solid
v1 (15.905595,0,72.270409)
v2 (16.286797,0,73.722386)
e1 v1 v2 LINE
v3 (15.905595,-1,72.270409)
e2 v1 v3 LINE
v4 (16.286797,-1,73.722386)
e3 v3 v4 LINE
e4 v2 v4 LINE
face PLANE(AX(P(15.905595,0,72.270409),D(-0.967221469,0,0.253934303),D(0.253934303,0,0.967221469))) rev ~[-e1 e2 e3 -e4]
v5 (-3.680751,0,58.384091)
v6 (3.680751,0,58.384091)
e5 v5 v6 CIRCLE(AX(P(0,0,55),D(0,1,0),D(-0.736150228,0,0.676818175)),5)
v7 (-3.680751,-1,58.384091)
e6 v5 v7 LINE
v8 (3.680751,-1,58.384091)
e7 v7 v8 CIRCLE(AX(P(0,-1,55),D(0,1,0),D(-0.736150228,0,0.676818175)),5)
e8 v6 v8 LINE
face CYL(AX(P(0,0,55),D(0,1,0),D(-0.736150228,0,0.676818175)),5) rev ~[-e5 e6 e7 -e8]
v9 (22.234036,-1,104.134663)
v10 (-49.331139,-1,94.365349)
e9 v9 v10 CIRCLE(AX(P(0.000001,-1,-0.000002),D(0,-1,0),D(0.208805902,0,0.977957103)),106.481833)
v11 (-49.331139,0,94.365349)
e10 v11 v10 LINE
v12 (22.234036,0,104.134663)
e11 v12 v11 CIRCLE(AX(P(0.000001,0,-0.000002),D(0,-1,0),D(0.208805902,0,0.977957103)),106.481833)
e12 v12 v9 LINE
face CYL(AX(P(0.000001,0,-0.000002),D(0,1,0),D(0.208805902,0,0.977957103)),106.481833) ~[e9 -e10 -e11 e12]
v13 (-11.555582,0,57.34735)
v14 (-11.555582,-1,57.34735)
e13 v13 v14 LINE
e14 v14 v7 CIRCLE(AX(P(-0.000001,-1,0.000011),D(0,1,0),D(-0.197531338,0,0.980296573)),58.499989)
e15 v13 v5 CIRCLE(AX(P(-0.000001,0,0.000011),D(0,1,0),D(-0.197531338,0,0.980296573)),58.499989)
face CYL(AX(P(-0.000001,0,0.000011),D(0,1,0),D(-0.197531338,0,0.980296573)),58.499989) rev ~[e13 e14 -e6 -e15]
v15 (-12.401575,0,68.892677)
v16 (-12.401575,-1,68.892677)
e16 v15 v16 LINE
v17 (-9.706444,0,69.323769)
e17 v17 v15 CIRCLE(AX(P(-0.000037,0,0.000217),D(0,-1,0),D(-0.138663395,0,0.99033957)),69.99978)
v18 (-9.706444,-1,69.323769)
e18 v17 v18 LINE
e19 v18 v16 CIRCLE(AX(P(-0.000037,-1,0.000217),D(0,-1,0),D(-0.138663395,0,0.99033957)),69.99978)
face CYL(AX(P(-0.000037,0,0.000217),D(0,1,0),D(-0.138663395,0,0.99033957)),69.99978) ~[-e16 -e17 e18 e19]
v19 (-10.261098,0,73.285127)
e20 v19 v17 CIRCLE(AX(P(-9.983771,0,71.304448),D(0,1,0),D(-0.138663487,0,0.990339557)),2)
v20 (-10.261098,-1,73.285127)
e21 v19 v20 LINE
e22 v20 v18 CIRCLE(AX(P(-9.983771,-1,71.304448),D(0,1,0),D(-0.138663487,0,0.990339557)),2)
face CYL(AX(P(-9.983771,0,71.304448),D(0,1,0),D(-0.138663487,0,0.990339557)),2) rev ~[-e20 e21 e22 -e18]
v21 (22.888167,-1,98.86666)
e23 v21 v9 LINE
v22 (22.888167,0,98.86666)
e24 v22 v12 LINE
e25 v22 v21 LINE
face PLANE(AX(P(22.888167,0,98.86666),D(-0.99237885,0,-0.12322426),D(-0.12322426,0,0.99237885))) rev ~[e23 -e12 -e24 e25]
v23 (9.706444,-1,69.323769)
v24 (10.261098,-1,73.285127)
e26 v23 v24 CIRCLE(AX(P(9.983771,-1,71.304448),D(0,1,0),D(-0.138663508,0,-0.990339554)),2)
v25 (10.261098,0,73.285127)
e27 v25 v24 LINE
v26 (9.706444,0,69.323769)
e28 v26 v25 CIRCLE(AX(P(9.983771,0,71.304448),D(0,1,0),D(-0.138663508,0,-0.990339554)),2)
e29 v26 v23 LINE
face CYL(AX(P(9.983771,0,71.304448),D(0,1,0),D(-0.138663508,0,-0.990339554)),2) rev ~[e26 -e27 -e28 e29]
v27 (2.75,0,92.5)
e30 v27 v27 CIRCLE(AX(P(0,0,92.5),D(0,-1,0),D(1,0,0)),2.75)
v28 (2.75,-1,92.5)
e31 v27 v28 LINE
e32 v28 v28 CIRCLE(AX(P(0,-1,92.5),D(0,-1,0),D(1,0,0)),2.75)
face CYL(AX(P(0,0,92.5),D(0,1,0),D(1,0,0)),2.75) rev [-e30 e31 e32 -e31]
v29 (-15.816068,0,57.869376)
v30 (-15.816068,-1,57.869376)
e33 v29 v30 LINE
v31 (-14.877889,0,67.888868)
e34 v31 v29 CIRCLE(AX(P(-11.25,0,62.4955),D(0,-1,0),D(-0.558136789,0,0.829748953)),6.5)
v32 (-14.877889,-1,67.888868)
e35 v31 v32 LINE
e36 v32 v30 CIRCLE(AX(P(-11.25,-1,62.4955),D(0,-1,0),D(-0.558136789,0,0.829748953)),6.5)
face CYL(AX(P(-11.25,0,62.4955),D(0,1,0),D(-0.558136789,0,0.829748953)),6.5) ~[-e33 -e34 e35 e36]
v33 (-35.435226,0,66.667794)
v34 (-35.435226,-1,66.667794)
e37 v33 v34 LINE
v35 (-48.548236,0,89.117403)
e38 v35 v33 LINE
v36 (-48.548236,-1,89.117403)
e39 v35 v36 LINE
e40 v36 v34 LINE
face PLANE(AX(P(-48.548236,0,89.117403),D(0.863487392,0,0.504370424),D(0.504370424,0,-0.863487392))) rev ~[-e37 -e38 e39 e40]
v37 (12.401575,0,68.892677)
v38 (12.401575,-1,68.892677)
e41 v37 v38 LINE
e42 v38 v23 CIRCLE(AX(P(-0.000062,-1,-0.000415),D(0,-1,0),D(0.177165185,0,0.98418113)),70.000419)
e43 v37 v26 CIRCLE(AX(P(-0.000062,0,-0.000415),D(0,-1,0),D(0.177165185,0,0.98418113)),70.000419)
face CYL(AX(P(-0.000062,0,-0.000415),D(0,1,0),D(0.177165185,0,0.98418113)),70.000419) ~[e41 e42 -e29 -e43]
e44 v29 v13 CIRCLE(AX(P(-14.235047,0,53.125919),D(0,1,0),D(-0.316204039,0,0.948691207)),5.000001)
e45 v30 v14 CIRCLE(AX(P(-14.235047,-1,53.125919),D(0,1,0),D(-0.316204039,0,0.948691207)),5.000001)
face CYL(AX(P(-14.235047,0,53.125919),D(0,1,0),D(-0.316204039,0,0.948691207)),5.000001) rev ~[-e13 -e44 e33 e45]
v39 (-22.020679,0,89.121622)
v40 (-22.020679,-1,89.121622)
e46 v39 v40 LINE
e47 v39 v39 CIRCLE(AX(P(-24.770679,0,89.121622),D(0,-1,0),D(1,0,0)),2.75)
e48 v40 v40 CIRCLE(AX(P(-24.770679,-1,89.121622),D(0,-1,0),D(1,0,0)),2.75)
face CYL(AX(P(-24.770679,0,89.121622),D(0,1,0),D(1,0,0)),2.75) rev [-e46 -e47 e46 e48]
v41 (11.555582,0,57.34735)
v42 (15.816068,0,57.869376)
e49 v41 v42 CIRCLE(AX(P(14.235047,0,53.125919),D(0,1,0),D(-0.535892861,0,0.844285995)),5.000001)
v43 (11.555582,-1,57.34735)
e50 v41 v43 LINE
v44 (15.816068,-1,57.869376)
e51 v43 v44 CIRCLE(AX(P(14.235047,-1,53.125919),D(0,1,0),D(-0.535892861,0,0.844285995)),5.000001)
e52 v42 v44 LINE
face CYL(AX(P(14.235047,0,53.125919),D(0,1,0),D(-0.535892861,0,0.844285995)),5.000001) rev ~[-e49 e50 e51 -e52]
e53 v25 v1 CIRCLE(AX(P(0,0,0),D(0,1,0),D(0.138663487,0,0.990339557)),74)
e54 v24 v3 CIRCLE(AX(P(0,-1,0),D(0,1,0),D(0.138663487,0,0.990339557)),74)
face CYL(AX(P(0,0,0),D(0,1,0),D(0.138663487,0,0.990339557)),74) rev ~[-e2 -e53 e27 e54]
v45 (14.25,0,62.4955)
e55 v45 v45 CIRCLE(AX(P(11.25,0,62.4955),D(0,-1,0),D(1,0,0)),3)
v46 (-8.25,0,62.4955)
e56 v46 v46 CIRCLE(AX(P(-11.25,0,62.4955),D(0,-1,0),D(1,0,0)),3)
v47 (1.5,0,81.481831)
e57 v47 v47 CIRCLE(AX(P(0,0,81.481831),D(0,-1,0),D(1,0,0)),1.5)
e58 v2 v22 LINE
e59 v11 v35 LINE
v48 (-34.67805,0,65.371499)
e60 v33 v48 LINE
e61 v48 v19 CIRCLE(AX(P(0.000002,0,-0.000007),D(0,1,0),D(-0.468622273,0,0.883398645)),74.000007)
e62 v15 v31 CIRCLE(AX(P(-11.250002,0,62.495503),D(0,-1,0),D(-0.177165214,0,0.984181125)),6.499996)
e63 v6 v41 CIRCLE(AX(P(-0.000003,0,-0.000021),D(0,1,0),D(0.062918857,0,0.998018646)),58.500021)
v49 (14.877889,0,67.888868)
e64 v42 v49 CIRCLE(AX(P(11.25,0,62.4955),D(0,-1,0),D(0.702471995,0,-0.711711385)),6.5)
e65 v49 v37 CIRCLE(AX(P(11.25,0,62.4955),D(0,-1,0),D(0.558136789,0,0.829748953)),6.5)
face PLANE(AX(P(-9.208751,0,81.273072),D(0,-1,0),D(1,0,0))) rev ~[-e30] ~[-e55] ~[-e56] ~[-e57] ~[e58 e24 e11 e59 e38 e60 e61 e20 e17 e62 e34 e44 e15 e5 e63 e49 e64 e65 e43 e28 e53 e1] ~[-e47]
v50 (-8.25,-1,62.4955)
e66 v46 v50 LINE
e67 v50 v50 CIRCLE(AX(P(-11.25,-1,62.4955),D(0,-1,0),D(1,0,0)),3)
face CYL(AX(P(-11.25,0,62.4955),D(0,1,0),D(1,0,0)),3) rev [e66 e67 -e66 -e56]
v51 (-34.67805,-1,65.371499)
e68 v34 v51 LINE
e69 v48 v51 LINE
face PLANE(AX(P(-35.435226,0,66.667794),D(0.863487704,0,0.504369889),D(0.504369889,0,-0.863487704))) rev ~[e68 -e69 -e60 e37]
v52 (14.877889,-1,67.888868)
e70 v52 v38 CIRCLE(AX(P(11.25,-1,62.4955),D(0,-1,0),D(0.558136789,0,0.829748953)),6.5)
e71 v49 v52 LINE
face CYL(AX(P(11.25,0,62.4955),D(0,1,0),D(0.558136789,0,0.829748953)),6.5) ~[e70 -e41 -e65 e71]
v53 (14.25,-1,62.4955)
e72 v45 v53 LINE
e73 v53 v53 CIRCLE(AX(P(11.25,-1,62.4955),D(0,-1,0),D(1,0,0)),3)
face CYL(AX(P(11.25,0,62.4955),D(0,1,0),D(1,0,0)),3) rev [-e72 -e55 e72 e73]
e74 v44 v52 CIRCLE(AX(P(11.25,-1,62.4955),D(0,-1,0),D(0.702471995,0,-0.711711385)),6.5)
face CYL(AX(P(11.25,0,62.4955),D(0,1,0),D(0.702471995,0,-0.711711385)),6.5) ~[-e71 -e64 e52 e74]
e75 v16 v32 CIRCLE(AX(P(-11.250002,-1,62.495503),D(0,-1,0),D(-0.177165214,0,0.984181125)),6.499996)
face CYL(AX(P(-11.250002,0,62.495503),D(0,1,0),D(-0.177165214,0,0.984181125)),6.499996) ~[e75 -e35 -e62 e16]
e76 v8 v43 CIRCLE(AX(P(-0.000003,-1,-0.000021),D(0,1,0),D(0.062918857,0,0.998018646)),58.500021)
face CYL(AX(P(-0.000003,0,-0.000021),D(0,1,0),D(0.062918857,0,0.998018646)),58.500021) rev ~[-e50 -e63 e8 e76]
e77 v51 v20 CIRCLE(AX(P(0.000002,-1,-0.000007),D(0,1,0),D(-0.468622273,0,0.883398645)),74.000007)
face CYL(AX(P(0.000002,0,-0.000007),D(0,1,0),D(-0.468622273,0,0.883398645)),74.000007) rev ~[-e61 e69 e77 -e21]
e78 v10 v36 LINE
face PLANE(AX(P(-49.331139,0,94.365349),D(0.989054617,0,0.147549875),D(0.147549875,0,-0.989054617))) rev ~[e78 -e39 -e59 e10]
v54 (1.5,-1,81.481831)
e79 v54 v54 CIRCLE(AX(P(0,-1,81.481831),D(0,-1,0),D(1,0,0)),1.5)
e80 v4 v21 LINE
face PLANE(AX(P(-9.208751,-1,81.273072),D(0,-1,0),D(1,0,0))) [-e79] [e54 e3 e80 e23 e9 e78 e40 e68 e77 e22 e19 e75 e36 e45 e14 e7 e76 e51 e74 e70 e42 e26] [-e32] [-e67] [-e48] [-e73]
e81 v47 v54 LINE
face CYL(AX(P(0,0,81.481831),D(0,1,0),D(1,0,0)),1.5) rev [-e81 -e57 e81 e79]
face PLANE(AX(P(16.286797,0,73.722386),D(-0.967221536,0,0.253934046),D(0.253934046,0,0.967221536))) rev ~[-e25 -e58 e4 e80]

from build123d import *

# Parameters (mm, degrees)
F0_R     = 3
F0_R_2   = 2.75
F0_R_3   = 1.5
F1_DEPTH = 1


# Not quite as in the source:
# - ends of sketch curves that miss each other by under 0.0002 mm in the source are joined


with BuildPart() as f1:
    # F0 (on Front) → F1 (new body)
    with BuildSketch(Plane.XZ):
        with BuildLine():
            ThreePointArc((10.2610980266, 73.2851271902), (13.0931802752, 72.8324696154), (15.9055950445, 72.2704092024))
            Line((15.9055950445, 72.2704092024), (16.286797, 73.722386))
            Line((16.286797, 73.722386), (22.888167, 98.86666))
            Line((22.888167, 98.86666), (22.234036, 104.134663))
            ThreePointArc((22.234036, 104.134663), (-14.4021915305, 105.5033516635), (-49.3311389264, 94.3653488593))
            Line((-49.3311389264, 94.3653488593), (-48.548236, 89.117403))
            Line((-48.548236, 89.117403), (-35.435226, 66.667794))
            Line((-35.435226, 66.667794), (-34.67805, 65.371499))
            ThreePointArc((-34.67805, 65.371499), (-22.8153047874, 70.3950414977), (-10.2610980266, 73.2851271902))
            ThreePointArc((-10.2610980266, 73.2851271902), (-8.0030918925, 71.581775015), (-9.706443985, 69.3237688925))
            ThreePointArc((-9.706443985, 69.3237688925), (-11.056110798, 69.1213600418), (-12.4015749915, 68.8926769529))
            ThreePointArc((-12.4015749915, 68.8926769529), (-13.6918696678, 68.5193918089), (-14.8778891297, 67.8888681928))
            ThreePointArc((-14.8778891297, 67.8888681928), (-17.7216913701, 63.1014792158), (-15.8160679868, 57.8693760134))
            ThreePointArc((-15.8160679868, 57.8693760134), (-13.6269577418, 58.088804993), (-11.5555822107, 57.3473496681))
            ThreePointArc((-11.5555822107, 57.3473496681), (-7.6357821132, 57.9995244077), (-3.6807509947, 58.3840909162))
            ThreePointArc((-3.6807509947, 58.3840909162), (0, 60), (3.6807510132, 58.3840910122))
            ThreePointArc((3.6807510132, 58.3840910122), (7.6357821132, 57.9995244077), (11.5555819538, 57.3473497706))
            ThreePointArc((11.5555819538, 57.3473497706), (13.6269577418, 58.088804993), (15.8160679296, 57.8693757888))
            ThreePointArc((15.8160679296, 57.8693757888), (17.7216913701, 63.1014792158), (14.8778891297, 67.8888681928))
            ThreePointArc((14.8778891297, 67.8888681928), (13.6918696678, 68.5193918089), (12.4015750198, 68.8926771098))
            ThreePointArc((12.4015750198, 68.8926771098), (11.056110798, 69.1213600418), (9.7064439965, 69.3237689753))
            ThreePointArc((9.7064439965, 69.3237689753), (8.0030918925, 71.581775015), (10.2610980266, 73.2851271902))
        make_face()
        with Locations((-11.25, 62.4955)):
            Circle(F0_R, mode=Mode.SUBTRACT)
        with Locations((-24.770679, 89.121622)):
            Circle(F0_R_2, mode=Mode.SUBTRACT)
        with Locations((0, 81.481831)):
            Circle(F0_R_3, mode=Mode.SUBTRACT)
        with Locations((0, 92.5)):
            Circle(F0_R_2, mode=Mode.SUBTRACT)
        with Locations((11.25, 62.4955)):
            Circle(F0_R, mode=Mode.SUBTRACT)
    extrude(amount=F1_DEPTH)


solid = f1.part
